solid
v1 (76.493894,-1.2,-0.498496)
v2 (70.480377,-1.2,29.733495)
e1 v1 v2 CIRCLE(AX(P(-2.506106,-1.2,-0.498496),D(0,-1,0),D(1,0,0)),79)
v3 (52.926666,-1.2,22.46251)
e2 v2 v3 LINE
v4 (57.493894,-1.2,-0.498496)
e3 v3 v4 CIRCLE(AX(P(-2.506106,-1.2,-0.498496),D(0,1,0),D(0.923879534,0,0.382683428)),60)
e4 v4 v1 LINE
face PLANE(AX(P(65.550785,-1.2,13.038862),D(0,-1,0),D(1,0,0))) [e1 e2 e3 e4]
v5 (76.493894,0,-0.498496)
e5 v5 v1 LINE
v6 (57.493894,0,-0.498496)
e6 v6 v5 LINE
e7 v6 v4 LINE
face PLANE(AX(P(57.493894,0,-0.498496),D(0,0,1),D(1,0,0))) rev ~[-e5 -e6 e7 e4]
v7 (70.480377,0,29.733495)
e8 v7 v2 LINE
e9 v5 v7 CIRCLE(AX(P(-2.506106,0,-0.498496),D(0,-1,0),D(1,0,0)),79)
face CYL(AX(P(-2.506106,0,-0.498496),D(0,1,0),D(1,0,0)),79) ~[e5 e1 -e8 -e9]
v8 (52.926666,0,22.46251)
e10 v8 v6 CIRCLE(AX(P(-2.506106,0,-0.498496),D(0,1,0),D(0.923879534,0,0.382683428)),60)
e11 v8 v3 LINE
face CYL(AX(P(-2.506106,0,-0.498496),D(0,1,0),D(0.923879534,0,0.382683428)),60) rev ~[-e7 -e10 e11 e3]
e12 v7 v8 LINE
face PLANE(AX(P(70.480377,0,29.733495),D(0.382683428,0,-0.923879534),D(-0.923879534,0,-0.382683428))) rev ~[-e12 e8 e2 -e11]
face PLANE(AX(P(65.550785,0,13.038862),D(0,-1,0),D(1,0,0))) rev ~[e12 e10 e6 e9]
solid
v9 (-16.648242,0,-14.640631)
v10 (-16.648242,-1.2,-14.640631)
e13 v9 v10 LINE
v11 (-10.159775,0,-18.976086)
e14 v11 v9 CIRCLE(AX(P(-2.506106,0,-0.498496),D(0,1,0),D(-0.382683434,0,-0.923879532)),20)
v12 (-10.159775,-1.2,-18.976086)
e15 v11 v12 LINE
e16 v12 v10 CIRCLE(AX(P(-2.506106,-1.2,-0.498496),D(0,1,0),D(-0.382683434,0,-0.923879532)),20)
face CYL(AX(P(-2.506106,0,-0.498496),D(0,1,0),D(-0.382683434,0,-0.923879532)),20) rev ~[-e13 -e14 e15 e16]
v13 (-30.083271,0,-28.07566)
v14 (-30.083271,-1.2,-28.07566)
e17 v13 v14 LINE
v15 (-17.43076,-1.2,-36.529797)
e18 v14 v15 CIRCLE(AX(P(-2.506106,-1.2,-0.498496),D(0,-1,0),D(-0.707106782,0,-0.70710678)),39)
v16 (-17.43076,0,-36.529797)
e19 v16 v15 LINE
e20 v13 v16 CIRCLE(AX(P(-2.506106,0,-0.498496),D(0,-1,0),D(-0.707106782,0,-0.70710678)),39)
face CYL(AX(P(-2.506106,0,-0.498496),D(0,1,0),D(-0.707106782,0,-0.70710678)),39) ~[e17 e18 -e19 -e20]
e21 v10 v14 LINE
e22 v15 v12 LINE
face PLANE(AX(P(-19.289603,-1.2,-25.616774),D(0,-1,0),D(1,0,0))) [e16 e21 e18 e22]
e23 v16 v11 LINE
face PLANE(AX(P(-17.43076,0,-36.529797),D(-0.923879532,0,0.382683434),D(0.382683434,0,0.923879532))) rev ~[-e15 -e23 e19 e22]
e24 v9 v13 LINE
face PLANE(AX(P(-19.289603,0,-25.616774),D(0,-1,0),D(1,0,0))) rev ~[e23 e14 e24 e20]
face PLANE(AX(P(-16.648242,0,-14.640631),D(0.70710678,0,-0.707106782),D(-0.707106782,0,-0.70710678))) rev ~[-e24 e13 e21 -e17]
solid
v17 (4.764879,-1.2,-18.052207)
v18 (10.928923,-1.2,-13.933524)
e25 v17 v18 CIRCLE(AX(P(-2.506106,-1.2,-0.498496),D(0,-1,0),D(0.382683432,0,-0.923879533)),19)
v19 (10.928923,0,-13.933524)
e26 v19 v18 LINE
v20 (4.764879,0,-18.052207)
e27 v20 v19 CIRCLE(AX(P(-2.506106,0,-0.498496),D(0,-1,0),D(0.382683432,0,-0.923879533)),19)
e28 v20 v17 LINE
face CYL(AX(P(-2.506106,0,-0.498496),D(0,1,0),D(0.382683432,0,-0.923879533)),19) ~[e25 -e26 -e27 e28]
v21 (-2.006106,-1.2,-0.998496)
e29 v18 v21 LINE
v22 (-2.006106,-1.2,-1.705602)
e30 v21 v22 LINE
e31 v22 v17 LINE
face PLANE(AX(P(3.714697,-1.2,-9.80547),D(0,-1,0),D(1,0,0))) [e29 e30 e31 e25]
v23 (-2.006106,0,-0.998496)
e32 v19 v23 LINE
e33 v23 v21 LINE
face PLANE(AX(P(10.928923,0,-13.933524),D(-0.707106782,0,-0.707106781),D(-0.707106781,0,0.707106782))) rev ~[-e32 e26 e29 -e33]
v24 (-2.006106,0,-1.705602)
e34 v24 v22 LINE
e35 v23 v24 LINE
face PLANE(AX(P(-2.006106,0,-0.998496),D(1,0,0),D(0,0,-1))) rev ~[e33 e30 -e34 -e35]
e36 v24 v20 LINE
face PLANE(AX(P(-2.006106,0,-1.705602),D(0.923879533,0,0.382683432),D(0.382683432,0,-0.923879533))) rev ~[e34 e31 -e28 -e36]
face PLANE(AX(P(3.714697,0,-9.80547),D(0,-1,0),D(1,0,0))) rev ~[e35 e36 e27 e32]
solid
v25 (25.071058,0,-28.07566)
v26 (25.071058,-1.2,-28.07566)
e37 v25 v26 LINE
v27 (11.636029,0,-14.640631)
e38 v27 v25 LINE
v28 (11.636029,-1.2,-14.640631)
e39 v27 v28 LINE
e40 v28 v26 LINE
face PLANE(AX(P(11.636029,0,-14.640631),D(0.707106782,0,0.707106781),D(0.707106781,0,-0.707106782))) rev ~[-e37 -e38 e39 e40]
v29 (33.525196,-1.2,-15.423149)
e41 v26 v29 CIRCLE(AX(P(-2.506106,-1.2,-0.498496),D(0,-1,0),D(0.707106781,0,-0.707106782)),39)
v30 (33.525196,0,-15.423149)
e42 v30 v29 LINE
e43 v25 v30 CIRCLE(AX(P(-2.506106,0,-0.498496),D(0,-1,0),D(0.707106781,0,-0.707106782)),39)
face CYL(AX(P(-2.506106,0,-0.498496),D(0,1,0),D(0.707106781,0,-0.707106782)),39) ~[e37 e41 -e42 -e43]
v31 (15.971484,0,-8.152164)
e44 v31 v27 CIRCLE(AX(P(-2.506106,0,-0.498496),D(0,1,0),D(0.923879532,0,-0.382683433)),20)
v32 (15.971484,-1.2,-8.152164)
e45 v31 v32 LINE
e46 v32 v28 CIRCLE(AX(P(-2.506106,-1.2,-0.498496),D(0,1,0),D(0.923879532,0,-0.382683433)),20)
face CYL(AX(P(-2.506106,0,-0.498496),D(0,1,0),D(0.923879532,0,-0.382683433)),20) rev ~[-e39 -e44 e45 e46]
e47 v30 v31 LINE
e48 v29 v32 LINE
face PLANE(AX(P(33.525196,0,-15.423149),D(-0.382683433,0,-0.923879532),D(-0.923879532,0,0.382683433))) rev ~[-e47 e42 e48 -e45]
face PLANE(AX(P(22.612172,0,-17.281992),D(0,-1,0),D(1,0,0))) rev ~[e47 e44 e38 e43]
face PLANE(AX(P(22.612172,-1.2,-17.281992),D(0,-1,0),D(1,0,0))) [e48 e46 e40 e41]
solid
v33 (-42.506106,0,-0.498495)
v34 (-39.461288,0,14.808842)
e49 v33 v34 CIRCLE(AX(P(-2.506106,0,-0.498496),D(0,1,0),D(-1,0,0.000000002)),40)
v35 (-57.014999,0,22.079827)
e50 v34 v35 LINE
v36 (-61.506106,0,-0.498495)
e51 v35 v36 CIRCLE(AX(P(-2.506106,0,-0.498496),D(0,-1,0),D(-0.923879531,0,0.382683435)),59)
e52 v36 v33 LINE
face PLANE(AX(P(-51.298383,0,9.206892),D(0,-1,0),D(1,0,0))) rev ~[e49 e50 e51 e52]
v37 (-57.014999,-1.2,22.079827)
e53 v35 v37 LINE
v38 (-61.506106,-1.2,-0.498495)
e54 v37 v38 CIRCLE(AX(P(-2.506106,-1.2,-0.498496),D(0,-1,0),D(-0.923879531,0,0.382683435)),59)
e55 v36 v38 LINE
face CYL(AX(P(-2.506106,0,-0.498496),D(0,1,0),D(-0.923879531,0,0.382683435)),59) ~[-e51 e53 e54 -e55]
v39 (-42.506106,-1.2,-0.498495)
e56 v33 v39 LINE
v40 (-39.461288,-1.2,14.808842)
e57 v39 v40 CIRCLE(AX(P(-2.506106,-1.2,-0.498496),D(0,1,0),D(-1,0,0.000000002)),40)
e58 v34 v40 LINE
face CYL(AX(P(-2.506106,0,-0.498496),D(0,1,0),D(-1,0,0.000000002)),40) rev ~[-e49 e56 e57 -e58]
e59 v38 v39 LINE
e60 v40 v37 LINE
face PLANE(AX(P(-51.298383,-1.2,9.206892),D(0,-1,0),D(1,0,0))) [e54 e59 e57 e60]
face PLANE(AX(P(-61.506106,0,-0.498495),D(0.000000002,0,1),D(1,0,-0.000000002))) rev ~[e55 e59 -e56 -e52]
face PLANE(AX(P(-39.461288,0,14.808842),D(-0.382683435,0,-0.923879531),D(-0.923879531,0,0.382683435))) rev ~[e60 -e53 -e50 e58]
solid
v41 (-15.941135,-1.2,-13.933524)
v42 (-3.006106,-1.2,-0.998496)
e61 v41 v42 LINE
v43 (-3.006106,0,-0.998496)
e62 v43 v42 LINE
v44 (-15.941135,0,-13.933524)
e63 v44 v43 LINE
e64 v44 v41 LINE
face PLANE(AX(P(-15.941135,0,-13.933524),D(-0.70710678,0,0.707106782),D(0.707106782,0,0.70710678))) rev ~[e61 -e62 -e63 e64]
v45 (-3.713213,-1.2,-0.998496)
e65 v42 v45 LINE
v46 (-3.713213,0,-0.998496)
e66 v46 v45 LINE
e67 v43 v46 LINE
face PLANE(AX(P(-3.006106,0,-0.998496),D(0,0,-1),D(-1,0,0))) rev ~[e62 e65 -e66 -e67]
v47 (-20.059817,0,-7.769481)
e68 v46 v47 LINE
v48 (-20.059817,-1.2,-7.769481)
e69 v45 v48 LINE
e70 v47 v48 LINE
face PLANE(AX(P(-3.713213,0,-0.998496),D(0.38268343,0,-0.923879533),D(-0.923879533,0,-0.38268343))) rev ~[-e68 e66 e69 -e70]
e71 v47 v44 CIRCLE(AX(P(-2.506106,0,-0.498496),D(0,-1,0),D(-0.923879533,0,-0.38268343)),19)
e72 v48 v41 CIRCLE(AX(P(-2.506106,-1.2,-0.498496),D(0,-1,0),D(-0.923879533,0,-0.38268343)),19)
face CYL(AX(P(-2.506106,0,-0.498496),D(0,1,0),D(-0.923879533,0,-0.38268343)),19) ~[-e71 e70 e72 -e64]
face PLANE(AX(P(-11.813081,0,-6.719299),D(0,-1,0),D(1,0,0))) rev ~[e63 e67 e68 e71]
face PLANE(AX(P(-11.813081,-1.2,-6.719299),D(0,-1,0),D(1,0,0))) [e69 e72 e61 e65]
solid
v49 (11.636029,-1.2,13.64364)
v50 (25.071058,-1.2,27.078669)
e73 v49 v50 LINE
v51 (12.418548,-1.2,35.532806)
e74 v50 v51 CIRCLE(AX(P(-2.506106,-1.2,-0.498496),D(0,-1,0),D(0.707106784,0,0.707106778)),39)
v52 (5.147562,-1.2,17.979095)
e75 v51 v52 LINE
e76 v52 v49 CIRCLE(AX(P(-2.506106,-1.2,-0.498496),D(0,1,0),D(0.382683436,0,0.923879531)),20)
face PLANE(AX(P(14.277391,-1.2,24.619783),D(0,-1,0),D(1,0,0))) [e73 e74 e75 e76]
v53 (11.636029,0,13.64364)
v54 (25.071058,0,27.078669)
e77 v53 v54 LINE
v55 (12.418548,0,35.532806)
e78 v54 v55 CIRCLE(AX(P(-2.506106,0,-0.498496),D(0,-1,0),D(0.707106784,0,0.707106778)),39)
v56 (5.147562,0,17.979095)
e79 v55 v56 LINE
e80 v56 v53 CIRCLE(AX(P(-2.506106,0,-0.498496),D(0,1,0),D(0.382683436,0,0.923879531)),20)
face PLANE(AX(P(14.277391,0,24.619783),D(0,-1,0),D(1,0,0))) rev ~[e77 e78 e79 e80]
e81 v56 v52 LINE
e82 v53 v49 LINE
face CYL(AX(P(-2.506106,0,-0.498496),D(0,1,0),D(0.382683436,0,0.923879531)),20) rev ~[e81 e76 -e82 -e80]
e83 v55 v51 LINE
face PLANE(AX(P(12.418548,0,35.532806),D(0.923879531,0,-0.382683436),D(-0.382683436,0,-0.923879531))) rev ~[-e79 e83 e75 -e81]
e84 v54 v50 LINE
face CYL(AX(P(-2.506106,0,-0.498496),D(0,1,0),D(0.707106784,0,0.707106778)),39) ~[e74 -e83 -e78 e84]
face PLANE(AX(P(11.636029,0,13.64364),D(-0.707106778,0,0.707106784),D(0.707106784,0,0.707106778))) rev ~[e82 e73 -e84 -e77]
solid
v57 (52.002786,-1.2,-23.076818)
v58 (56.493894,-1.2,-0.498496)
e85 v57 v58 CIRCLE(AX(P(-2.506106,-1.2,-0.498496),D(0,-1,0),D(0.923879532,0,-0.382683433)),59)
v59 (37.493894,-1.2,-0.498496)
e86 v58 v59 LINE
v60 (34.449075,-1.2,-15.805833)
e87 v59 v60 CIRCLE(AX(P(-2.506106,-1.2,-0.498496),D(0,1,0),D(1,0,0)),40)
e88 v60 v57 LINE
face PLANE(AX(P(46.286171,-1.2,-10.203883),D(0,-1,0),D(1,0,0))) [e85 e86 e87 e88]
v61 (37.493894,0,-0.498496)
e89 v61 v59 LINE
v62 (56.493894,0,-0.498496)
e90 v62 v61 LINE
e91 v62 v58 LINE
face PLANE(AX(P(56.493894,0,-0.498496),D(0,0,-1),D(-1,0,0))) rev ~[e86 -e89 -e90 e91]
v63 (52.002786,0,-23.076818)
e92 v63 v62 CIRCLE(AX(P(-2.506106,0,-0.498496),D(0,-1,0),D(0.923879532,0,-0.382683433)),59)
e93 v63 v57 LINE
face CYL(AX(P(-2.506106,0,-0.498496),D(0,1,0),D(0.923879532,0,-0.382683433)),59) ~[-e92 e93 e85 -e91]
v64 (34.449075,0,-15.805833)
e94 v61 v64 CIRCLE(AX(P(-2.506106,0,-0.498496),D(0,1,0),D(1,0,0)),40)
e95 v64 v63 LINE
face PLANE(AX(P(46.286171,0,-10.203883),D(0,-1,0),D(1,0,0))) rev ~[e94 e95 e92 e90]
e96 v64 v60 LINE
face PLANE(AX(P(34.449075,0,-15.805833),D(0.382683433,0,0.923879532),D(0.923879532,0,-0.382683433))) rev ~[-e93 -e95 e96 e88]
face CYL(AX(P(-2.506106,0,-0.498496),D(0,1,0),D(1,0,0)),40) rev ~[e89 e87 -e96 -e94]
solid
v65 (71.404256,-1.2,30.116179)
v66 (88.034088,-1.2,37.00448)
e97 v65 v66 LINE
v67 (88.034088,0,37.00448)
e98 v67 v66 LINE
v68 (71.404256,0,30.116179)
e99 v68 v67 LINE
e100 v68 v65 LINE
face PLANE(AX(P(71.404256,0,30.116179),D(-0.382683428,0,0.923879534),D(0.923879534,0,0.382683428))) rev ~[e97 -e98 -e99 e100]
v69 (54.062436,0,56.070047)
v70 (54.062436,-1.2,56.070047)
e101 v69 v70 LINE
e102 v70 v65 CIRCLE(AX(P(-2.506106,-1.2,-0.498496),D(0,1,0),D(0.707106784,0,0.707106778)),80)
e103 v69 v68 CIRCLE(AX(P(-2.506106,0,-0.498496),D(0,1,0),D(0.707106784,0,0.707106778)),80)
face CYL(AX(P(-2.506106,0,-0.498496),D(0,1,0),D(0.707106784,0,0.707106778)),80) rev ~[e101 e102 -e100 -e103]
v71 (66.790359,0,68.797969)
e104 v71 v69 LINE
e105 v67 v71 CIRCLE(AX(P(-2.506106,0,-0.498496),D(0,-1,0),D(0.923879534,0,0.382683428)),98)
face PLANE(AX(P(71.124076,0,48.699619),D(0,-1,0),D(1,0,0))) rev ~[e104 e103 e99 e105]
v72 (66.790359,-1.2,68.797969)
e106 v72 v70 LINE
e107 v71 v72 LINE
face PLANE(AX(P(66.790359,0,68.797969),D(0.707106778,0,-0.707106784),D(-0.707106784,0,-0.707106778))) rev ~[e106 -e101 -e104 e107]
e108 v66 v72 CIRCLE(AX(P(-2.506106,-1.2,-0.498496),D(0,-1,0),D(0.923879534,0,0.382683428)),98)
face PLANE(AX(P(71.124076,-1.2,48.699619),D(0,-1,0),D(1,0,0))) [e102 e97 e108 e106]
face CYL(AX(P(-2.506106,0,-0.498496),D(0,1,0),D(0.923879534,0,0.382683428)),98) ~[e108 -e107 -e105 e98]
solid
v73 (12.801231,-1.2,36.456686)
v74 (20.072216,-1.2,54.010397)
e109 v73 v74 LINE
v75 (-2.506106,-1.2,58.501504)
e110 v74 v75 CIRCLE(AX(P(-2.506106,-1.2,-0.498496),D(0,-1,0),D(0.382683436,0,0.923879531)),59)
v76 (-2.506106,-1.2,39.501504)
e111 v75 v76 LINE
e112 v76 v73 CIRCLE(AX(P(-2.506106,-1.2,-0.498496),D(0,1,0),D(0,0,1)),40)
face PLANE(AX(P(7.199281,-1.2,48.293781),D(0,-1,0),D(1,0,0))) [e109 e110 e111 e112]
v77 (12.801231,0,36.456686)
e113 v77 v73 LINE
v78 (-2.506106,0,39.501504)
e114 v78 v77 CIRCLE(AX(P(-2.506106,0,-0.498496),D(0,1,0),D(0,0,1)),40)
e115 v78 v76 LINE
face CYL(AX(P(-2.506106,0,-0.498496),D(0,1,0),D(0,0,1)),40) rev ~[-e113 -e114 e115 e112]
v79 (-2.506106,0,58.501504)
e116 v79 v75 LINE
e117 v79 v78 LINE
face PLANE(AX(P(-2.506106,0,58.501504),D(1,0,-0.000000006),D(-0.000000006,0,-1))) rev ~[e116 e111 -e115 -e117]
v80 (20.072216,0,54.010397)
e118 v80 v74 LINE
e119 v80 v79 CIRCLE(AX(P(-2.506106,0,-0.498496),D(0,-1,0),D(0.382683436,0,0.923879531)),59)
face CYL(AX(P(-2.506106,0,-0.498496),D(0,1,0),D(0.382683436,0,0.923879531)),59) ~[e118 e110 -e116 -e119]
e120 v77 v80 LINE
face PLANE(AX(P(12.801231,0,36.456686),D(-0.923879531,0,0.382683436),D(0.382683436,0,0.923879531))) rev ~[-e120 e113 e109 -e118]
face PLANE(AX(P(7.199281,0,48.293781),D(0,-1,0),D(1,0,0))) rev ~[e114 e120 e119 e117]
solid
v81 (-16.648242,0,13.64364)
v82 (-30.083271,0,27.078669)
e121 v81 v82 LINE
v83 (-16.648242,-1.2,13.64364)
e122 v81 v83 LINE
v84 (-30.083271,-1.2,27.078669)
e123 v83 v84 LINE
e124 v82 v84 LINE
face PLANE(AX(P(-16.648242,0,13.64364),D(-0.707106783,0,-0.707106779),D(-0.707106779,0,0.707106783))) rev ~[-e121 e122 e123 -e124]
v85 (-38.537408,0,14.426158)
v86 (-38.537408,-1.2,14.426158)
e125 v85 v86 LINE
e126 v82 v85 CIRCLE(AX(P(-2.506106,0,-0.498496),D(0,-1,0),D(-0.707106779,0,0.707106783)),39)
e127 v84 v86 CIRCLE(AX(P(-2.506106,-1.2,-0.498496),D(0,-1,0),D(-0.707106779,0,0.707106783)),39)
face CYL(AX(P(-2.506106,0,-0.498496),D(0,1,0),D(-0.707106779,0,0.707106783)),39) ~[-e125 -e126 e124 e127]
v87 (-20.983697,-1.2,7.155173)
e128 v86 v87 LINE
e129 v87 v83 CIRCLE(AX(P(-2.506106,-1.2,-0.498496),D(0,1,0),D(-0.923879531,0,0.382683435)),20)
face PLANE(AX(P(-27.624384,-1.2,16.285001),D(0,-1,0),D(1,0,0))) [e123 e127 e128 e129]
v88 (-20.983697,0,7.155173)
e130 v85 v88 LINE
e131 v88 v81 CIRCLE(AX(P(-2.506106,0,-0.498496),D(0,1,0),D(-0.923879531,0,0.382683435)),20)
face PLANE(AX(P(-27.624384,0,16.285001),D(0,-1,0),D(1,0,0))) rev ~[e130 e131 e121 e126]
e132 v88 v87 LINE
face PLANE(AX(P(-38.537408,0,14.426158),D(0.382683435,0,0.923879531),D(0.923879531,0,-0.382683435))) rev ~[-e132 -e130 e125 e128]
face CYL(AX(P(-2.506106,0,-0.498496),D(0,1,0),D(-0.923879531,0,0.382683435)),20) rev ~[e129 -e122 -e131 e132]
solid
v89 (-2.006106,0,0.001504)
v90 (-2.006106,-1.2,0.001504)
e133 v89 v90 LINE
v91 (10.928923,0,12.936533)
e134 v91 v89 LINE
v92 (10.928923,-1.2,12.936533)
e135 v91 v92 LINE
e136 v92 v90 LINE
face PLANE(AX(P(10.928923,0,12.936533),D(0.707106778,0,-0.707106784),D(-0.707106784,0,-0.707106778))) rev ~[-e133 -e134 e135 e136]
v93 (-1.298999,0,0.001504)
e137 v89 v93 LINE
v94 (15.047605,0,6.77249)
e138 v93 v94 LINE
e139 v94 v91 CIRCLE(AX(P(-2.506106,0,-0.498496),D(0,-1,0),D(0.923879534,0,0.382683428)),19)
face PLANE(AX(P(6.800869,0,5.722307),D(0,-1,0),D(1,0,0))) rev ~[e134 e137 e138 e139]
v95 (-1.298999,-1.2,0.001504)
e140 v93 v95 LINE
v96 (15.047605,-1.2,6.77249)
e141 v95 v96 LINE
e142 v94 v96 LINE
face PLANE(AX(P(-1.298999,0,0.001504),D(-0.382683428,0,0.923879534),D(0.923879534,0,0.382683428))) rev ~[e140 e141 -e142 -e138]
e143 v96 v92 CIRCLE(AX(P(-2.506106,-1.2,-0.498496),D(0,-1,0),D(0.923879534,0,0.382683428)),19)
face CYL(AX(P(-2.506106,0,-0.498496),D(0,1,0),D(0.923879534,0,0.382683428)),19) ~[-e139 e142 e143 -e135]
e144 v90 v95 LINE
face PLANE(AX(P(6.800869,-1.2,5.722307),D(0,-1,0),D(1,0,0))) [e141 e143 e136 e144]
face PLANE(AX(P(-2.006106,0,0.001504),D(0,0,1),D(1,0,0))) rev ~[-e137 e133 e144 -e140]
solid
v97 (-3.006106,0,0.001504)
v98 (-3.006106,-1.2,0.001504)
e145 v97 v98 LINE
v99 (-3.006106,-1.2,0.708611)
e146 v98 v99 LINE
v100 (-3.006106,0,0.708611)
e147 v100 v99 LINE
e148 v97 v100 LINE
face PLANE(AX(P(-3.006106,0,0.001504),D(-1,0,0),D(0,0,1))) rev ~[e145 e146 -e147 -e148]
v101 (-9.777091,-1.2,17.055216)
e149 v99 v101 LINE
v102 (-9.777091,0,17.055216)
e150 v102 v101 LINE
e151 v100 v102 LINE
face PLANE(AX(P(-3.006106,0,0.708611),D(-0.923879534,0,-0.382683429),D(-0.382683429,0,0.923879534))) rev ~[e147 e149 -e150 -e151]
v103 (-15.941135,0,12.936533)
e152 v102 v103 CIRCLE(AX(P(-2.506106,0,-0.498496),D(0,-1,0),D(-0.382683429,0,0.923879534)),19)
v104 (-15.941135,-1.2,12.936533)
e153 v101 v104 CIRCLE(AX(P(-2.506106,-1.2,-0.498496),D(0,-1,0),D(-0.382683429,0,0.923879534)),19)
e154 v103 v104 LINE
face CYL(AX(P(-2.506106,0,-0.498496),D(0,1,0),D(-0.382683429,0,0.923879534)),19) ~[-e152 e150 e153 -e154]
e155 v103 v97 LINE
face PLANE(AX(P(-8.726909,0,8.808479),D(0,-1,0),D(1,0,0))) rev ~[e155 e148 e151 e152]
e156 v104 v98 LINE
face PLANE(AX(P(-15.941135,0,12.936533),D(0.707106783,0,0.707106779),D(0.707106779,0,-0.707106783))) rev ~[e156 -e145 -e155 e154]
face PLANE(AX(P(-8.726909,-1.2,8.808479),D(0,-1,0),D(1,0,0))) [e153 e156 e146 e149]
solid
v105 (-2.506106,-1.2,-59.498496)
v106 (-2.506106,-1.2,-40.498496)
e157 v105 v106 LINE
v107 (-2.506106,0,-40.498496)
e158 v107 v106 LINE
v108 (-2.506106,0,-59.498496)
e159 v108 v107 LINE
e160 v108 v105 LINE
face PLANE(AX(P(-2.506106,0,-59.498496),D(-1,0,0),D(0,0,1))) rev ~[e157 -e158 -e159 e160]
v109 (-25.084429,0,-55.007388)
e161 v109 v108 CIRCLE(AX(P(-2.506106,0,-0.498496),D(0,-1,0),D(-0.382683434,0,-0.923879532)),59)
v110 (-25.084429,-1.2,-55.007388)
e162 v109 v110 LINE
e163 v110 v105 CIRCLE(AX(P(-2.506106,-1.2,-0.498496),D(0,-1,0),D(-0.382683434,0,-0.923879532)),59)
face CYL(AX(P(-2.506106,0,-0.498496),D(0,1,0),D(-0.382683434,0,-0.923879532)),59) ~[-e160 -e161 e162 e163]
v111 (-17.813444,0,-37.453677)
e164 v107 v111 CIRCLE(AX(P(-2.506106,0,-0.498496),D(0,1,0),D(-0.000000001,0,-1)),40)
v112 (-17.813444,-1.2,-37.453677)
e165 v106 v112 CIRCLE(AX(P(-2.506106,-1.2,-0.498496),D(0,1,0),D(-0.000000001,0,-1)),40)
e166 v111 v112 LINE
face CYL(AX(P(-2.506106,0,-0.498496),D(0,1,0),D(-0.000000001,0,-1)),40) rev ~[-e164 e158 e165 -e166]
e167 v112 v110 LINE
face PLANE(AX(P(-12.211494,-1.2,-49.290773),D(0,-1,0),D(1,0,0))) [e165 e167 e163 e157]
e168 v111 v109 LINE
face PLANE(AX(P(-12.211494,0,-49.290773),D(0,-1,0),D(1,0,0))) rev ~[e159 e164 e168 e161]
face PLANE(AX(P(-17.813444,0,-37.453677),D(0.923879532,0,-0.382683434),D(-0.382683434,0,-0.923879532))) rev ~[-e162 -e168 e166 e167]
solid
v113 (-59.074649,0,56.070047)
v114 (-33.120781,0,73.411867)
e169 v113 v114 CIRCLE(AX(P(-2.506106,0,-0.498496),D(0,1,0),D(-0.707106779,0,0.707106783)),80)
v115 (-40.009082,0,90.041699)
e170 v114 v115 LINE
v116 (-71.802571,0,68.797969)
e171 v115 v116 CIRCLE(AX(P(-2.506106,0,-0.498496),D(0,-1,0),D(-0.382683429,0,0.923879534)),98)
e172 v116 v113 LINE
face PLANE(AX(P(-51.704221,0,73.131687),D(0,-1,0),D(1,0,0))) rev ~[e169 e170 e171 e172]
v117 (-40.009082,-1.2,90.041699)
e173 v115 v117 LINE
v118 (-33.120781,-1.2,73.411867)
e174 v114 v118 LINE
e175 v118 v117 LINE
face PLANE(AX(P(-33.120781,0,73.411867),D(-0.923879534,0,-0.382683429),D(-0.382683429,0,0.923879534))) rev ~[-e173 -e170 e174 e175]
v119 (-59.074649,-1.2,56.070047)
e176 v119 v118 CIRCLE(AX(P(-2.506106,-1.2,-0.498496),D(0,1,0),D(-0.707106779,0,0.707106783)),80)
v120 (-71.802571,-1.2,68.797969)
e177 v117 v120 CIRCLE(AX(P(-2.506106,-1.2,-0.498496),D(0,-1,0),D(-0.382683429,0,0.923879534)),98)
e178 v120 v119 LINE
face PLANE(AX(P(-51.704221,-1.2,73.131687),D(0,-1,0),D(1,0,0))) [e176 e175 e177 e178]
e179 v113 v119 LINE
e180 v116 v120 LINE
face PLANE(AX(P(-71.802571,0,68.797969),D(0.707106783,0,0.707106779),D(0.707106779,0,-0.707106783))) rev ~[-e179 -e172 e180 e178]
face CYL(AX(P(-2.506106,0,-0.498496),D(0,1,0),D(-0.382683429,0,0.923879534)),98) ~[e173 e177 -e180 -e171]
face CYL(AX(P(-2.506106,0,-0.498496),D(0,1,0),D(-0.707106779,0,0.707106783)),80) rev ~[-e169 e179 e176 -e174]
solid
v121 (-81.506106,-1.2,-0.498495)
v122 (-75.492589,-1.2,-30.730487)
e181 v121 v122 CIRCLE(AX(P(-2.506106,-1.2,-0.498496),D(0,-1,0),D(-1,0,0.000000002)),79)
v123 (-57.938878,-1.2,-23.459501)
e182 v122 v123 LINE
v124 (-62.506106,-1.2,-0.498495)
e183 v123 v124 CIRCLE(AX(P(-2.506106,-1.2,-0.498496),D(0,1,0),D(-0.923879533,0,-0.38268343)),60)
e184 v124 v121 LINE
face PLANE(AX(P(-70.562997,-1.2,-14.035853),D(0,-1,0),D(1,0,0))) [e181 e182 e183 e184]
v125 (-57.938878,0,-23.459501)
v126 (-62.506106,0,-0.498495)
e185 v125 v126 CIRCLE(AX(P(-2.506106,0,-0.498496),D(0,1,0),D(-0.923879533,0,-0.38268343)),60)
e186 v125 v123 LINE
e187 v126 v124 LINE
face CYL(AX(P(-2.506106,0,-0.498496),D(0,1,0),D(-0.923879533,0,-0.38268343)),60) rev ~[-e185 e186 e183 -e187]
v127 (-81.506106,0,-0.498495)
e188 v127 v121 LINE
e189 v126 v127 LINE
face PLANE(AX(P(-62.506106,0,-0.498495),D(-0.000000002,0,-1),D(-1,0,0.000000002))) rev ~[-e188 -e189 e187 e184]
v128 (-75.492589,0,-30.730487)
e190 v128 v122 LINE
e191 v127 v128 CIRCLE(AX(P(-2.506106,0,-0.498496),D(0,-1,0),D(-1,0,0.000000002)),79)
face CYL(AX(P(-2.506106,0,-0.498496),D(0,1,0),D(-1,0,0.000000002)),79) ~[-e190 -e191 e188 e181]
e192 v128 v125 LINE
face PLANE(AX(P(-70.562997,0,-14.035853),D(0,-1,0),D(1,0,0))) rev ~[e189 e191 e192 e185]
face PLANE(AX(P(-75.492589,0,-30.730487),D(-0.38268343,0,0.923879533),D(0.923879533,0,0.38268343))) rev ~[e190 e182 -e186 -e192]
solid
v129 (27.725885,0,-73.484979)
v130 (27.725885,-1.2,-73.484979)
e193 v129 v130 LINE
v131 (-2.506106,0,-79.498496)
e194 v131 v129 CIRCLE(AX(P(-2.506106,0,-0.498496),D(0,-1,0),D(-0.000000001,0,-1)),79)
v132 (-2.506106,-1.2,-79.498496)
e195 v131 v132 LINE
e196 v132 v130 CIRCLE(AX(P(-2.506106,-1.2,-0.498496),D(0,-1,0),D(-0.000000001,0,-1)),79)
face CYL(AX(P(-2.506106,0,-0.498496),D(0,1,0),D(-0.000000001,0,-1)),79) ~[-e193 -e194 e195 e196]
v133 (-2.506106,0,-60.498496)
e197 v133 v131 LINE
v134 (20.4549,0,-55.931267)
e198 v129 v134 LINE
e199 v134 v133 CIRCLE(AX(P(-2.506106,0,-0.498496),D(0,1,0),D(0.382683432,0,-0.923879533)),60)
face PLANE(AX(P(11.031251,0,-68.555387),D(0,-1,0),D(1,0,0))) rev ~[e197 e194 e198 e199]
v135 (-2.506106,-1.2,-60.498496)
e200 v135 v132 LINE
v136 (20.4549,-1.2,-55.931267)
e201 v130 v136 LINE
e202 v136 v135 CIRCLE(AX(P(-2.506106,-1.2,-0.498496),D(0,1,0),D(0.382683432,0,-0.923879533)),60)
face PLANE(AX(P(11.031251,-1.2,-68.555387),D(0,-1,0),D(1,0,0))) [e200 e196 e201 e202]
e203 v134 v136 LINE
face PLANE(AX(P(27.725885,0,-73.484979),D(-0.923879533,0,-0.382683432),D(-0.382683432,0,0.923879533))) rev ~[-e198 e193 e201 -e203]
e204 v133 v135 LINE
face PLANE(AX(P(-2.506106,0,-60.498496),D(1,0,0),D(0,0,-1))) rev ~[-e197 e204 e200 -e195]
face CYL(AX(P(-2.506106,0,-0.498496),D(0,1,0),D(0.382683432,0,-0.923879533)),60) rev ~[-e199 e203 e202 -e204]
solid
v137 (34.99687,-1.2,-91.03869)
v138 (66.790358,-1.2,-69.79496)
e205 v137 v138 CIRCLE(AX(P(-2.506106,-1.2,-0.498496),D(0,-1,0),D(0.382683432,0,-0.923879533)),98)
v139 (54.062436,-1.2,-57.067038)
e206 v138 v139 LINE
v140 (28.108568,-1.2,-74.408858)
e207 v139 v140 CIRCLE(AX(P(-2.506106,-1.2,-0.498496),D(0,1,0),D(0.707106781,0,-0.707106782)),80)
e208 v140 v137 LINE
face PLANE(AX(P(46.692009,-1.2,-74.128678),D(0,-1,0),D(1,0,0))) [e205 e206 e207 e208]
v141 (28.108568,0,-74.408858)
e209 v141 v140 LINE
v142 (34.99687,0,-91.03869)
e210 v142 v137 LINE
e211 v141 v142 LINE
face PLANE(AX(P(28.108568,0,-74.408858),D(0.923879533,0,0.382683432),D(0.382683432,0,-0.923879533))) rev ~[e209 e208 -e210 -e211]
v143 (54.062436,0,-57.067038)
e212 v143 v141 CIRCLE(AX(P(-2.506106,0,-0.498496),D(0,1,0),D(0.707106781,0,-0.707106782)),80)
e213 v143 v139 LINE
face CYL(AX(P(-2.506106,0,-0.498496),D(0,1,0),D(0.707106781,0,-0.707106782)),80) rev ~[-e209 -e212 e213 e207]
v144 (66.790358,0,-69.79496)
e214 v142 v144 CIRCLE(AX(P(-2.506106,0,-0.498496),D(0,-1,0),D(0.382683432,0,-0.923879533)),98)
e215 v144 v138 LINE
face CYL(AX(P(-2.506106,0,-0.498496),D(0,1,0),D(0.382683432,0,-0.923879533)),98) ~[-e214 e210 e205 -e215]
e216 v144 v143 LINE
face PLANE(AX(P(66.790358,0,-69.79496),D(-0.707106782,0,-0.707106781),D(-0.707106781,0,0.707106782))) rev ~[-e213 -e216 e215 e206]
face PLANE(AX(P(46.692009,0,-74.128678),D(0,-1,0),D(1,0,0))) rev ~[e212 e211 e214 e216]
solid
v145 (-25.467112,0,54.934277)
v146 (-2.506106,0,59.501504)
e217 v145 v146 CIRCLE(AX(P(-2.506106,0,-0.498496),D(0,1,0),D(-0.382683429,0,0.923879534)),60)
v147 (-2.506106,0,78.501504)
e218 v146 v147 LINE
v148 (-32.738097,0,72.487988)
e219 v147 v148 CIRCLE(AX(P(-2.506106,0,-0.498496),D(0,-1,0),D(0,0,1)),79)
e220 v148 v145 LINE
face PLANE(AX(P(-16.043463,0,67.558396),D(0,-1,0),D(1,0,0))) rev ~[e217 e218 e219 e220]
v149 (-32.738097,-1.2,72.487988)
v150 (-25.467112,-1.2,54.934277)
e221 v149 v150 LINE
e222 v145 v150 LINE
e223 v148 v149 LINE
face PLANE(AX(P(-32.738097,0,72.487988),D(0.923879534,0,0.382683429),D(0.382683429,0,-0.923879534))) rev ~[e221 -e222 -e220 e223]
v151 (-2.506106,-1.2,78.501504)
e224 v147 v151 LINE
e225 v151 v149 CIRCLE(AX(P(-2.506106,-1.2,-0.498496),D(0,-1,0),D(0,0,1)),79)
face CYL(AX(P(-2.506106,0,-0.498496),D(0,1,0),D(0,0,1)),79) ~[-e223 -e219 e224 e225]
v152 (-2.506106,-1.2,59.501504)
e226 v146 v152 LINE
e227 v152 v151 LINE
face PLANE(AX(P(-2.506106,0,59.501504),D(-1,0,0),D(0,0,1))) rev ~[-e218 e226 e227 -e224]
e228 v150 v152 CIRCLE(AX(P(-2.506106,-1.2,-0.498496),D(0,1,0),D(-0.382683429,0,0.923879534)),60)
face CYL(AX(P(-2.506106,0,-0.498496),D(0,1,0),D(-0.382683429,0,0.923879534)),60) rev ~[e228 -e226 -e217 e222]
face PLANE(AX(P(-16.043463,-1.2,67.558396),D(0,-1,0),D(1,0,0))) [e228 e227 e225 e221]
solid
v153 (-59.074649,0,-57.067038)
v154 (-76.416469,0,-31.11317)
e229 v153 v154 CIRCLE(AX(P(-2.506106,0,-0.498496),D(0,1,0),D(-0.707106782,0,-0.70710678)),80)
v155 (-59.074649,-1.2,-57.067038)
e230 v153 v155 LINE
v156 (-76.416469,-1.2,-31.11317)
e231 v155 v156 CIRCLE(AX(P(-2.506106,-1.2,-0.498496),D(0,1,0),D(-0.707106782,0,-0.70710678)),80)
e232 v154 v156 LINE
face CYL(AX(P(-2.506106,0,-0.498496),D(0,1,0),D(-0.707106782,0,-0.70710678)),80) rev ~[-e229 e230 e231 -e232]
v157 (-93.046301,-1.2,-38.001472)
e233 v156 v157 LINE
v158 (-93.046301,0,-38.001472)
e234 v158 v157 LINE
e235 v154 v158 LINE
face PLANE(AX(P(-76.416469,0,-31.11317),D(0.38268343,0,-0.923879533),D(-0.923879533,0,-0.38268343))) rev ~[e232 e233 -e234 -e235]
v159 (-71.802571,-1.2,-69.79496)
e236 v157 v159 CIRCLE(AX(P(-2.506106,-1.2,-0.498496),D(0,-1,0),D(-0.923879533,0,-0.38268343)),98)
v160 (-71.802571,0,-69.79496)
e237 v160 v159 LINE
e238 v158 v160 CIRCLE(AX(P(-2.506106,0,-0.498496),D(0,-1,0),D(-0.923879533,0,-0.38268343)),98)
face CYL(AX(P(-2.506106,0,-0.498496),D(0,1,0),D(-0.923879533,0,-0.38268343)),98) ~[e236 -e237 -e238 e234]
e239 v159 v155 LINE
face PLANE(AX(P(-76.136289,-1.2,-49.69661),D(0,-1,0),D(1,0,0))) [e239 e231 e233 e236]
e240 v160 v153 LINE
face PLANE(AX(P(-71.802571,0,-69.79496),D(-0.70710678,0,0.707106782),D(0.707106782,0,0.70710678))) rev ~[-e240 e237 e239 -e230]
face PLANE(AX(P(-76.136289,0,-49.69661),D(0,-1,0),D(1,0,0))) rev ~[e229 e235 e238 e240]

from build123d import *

# Parameters (mm, degrees)
F1_DEPTH = 1.2


# Not quite as in the source:
# - ends of sketch curves that miss each other by under 0.0002 mm in the source are joined


with BuildPart() as f1:
    # F0 (on Front) → F1 (new body)
    with BuildSketch(Plane.XZ):
        with BuildLine():
            Line((-1.2989994546, 0.0015044786), (15.0476048994, 6.7724896142))
            ThreePointArc((15.0476048994, 6.7724896142), (13.2918164287, 10.0573388369), (10.928922648, 12.9365332644))
            Line((10.928922648, 12.9365332644), (-2.0061062491, 0.0015044765))
            Line((-2.0061062498, 0.0015044786), (-1.2989994546, 0.0015044786))
        make_face()
    extrude(amount=F1_DEPTH)


with BuildPart() as f1b:
    # F0 (on Front) → F1, piece 2 (new body)
    with BuildSketch(Plane.XZ):
        with BuildLine():
            Line((11.6360294322, 13.6436400426), (25.0710583314, 27.0786688285))
            ThreePointArc((25.0710583314, 27.0786688285), (19.1611329685, 31.9288192702), (12.4185477522, 35.532806188))
            Line((12.4185477522, 35.532806188), (5.1475624685, 17.9790950988))
            ThreePointArc((5.1475624685, 17.9790950988), (8.6052984769, 16.1308966794), (11.6360294322, 13.6436400426))
        make_face()
    extrude(amount=F1_DEPTH)


with BuildPart() as f1c:
    # F0 (on Front) → F1, piece 3 (new body)
    with BuildSketch(Plane.XZ):
        with BuildLine():
            Line((12.8012311882, 36.4566857191), (20.0722164719, 54.0103968083))
            ThreePointArc((20.0722164719, 54.0103968083), (9.0042229134, 57.3678359894), (-2.5061061445, 58.5015044786))
            Line((-2.5061061445, 58.5015044786), (-2.5061062512, 39.5015044786))
            ThreePointArc((-2.5061062512, 39.5015044786), (5.2975067418, 38.7329156724), (12.8012311882, 36.4566857191))
        make_face()
    extrude(amount=F1_DEPTH)


with BuildPart() as f1d:
    # F0 (on Front) → F1, piece 4 (new body)
    with BuildSketch(Plane.XZ):
        with BuildLine():
            Line((-2.5061062512, 59.5015044786), (-2.5061062512, 78.5015044786))
            ThreePointArc((-2.5061062512, 78.5015044786), (-17.918241492, 76.9835416699), (-32.7380971661, 72.4879876471))
            Line((-32.7380971661, 72.4879876471), (-25.4671120094, 54.9342765053))
            ThreePointArc((-25.4671120094, 54.9342765053), (-14.2115254214, 58.3486213327), (-2.5061062512, 59.5015044786))
        make_face()
    extrude(amount=F1_DEPTH)


with BuildPart() as f1e:
    # F0 (on Front) → F1, piece 5 (new body)
    with BuildSketch(Plane.XZ):
        with BuildLine():
            ThreePointArc((-59.0746485757, 56.0700471439), (-46.9517246823, 66.0190736034), (-33.1207805954, 73.4118671809))
            Line((-33.1207805954, 73.4118671809), (-40.0090823229, 90.041698789))
            ThreePointArc((-40.0090823229, 90.041698789), (-56.9519888293, 80.9855266564), (-71.8025705987, 68.7979692436))
            Line((-71.8025705987, 68.7979692436), (-59.0746485757, 56.0700471439))
        make_face()
    extrude(amount=F1_DEPTH)


with BuildPart() as f1f:
    # F0 (on Front) → F1, piece 6 (new body)
    with BuildSketch(Plane.XZ):
        with BuildLine():
            Line((-15.9411350532, 12.9365333616), (-3.0061062497, 0.0015044801))
            Line((-3.0061062512, 0.0015044796), (-3.0061062512, 0.7086112711))
            Line((-3.0061062512, 0.7086112711), (-9.7770914079, 17.0552156204))
            ThreePointArc((-9.7770914079, 17.0552156204), (-13.0619406286, 15.2994271457), (-15.9411350532, 12.9365333616))
        make_face()
    extrude(amount=F1_DEPTH)


with BuildPart() as f1g:
    # F0 (on Front) → F1, piece 7 (new body)
    with BuildSketch(Plane.XZ):
        with BuildLine():
            Line((-16.6482418323, 13.6436401449), (-30.0832706344, 27.0786690279))
            ThreePointArc((-30.0832706344, 27.0786690279), (-34.933421069, 21.1687436591), (-38.5374079786, 14.4261584385))
            Line((-38.5374079786, 14.4261584385), (-20.9836968806, 7.155173176))
            ThreePointArc((-20.9836968806, 7.155173176), (-19.1354984654, 10.6129091865), (-16.6482418323, 13.6436401449))
        make_face()
    extrude(amount=F1_DEPTH)


with BuildPart() as f1h:
    # F0 (on Front) → F1, piece 8 (new body)
    with BuildSketch(Plane.XZ):
        with BuildLine():
            Line((-39.4612875101, 14.8088418734), (-57.0149986081, 22.0798271359))
            ThreePointArc((-57.0149986081, 22.0798271359), (-60.3724377655, 11.0118336257), (-61.5061062512, -0.4984953792))
            Line((-61.5061062512, -0.4984953792), (-42.5061062512, -0.498495425))
            ThreePointArc((-42.5061062512, -0.498495425), (-41.7375174473, 7.3051174597), (-39.4612875101, 14.8088418734))
        make_face()
    extrude(amount=F1_DEPTH)


with BuildPart() as f1i:
    # F0 (on Front) → F1, piece 9 (new body)
    with BuildSketch(Plane.XZ):
        with BuildLine():
            ThreePointArc((-81.5061062512, -0.498495331), (-79.9881434379, -15.9106307856), (-75.4925893833, -30.7304865244))
            Line((-75.4925893833, -30.7304865244), (-57.9388782503, -23.4595013464))
            ThreePointArc((-57.9388782503, -23.4595013464), (-61.3532231018, -12.2039147094), (-62.5061062512, -0.4984953768))
            Line((-62.5061062512, -0.4984953768), (-81.5061062512, -0.498495331))
        make_face()
    extrude(amount=F1_DEPTH)


with BuildPart() as f1j:
    # F0 (on Front) → F1, piece 10 (new body)
    with BuildSketch(Plane.XZ):
        with BuildLine():
            Line((-71.8025709327, -69.7949599525), (-59.0746488484, -57.0670379141))
            ThreePointArc((-59.0746488484, -57.0670379141), (-69.0236753224, -44.9441140327), (-76.4164689166, -31.1131699548))
            Line((-76.4164689166, -31.1131699548), (-93.0463005164, -38.0014717023))
            ThreePointArc((-93.0463005164, -38.0014717023), (-83.9901283634, -54.9443781978), (-71.8025709327, -69.7949599525))
        make_face()
    extrude(amount=F1_DEPTH)


with BuildPart() as f1k:
    # F0 (on Front) → F1, piece 11 (new body)
    with BuildSketch(Plane.XZ):
        with BuildLine():
            Line((-15.941135118, -13.9335243397), (-3.0061062521, -0.9984955205))
            Line((-3.0061062518, -0.9984955214), (-3.7132130396, -0.9984955214))
            Line((-3.7132130396, -0.9984955214), (-20.0598173842, -7.7694806994))
            ThreePointArc((-20.0598173842, -7.7694806994), (-18.3040289056, -11.0543299179), (-15.941135118, -13.9335243397))
        make_face()
    extrude(amount=F1_DEPTH)


with BuildPart() as f1l:
    # F0 (on Front) → F1, piece 12 (new body)
    with BuildSketch(Plane.XZ):
        with BuildLine():
            ThreePointArc((-30.0832707673, -28.0756599379), (-24.1733453927, -32.9258103653), (-17.4307601677, -36.5297972669))
            Line((-17.4307601677, -36.5297972669), (-10.1597749263, -18.9760861601))
            ThreePointArc((-10.1597749263, -18.9760861601), (-13.6175109391, -17.1278877491), (-16.6482419005, -14.6406311196))
            Line((-16.6482419005, -14.6406311196), (-30.0832707673, -28.0756599379))
        make_face()
    extrude(amount=F1_DEPTH)


with BuildPart() as f1m:
    # F0 (on Front) → F1, piece 13 (new body)
    with BuildSketch(Plane.XZ):
        with BuildLine():
            ThreePointArc((-25.0844288428, -55.0073879056), (-14.0164353111, -58.3648270531), (-2.5061062867, -59.4984955214))
            Line((-2.5061062512, -59.4984955214), (-2.5061062512, -40.4984955214))
            ThreePointArc((-2.5061062753, -40.4984955214), (-10.3097191732, -39.7299067293), (-17.8134436014, -37.4536767988))
            Line((-17.8134436014, -37.4536767988), (-25.0844288428, -55.0073879056))
        make_face()
    extrude(amount=F1_DEPTH)


with BuildPart() as f1n:
    # F0 (on Front) → F1, piece 14 (new body)
    with BuildSketch(Plane.XZ):
        with BuildLine():
            ThreePointArc((-2.5061062988, -79.4984955214), (12.9060291297, -77.9805326849), (27.7258848397, -73.4849786172))
            Line((27.7258848397, -73.4849786172), (20.4548996406, -55.9312674929))
            ThreePointArc((20.4548996406, -55.9312674929), (9.1993130255, -59.3456123544), (-2.5061062873, -60.4984955214))
            Line((-2.5061062512, -60.4984955214), (-2.5061062512, -79.4984955214))
        make_face()
    extrude(amount=F1_DEPTH)


with BuildPart() as f1o:
    # F0 (on Front) → F1, piece 15 (new body)
    with BuildSketch(Plane.XZ):
        with BuildLine():
            Line((66.7903582634, -69.7949601195), (54.0624362097, -57.0670380504))
            ThreePointArc((54.0624362097, -57.0670380504), (41.9395123403, -67.0160645391), (28.1085682712, -74.40885815))
            Line((28.1085682712, -74.40885815), (34.9968700388, -91.0386897414))
            ThreePointArc((34.9968700388, -91.0386897414), (51.9397765234, -81.9825175681), (66.7903582634, -69.7949601195))
        make_face()
    extrude(amount=F1_DEPTH)


with BuildPart() as f1p:
    # F0 (on Front) → F1, piece 16 (new body)
    with BuildSketch(Plane.XZ):
        with BuildLine():
            ThreePointArc((4.7648789479, -18.0522066457), (8.0497281643, -16.2964181631), (10.9289225833, -13.9335243721))
            Line((10.9289225833, -13.9335243721), (-2.0061062515, -0.9984955217))
            Line((-2.0061062512, -0.9984955216), (-2.0061062512, -1.7056023057))
            Line((-2.0061062512, -1.7056023057), (4.7648789479, -18.0522066457))
        make_face()
    extrude(amount=F1_DEPTH)


with BuildPart() as f1q:
    # F0 (on Front) → F1, piece 17 (new body)
    with BuildSketch(Plane.XZ):
        with BuildLine():
            ThreePointArc((25.0710581985, -28.0756600043), (29.9212086188, -22.1657346239), (33.5251955123, -15.4231493945))
            Line((33.5251955123, -15.4231493945), (15.9714843967, -8.1521641743))
            ThreePointArc((15.9714843967, -8.1521641743), (14.1232859899, -11.6099001893), (11.636029364, -14.6406311537))
            Line((11.636029364, -14.6406311537), (25.0710581985, -28.0756600043))
        make_face()
    extrude(amount=F1_DEPTH)


with BuildPart() as f1r:
    # F0 (on Front) → F1, piece 18 (new body)
    with BuildSketch(Plane.XZ):
        with BuildLine():
            ThreePointArc((52.0027861602, -23.0768180474), (55.3602252909, -12.0088245291), (56.4938937488, -0.4984955214))
            Line((56.4938937488, -0.4984955214), (37.4938937488, -0.4984955214))
            ThreePointArc((37.4938937488, -0.4984955214), (36.7253049638, -8.302108408), (34.4490750447, -15.8058328272))
            Line((34.4490750447, -15.8058328272), (52.0027861602, -23.0768180474))
        make_face()
    extrude(amount=F1_DEPTH)


with BuildPart() as f1s:
    # F0 (on Front) → F1, piece 19 (new body)
    with BuildSketch(Plane.XZ):
        with BuildLine():
            Line((57.4938937488, -0.4984955214), (76.4938937488, -0.4984955214))
            ThreePointArc((76.4938937488, -0.4984955214), (74.9759309355, 14.9136397428), (70.4803769538, 29.7334953056))
            Line((70.4803769538, 29.7334953056), (52.9266658033, 22.46251017))
            ThreePointArc((52.9266658033, 22.46251017), (56.3410105995, 11.2069236666), (57.4938937488, -0.4984955214))
        make_face()
    extrude(amount=F1_DEPTH)


with BuildPart() as f1t:
    # F0 (on Front) → F1, piece 20 (new body)
    with BuildSketch(Plane.XZ):
        with BuildLine():
            ThreePointArc((54.0624364823, 56.0700467349), (64.0114629272, 43.9471228295), (71.4042564881, 30.1161787338))
            Line((71.4042564881, 30.1161787338), (88.0340881044, 37.0044804412))
            ThreePointArc((88.0340881044, 37.0044804412), (78.9779159923, 53.9473869585), (66.7903585974, 68.7979687426))
            Line((66.7903585974, 68.7979687426), (54.0624364823, 56.0700467349))
        make_face()
    extrude(amount=F1_DEPTH)


solid = Compound([f1.part, f1b.part, f1c.part, f1d.part, f1e.part, f1f.part, f1g.part, f1h.part, f1i.part, f1j.part, f1k.part, f1l.part, f1m.part, f1n.part, f1o.part, f1p.part, f1q.part, f1r.part, f1s.part, f1t.part])
